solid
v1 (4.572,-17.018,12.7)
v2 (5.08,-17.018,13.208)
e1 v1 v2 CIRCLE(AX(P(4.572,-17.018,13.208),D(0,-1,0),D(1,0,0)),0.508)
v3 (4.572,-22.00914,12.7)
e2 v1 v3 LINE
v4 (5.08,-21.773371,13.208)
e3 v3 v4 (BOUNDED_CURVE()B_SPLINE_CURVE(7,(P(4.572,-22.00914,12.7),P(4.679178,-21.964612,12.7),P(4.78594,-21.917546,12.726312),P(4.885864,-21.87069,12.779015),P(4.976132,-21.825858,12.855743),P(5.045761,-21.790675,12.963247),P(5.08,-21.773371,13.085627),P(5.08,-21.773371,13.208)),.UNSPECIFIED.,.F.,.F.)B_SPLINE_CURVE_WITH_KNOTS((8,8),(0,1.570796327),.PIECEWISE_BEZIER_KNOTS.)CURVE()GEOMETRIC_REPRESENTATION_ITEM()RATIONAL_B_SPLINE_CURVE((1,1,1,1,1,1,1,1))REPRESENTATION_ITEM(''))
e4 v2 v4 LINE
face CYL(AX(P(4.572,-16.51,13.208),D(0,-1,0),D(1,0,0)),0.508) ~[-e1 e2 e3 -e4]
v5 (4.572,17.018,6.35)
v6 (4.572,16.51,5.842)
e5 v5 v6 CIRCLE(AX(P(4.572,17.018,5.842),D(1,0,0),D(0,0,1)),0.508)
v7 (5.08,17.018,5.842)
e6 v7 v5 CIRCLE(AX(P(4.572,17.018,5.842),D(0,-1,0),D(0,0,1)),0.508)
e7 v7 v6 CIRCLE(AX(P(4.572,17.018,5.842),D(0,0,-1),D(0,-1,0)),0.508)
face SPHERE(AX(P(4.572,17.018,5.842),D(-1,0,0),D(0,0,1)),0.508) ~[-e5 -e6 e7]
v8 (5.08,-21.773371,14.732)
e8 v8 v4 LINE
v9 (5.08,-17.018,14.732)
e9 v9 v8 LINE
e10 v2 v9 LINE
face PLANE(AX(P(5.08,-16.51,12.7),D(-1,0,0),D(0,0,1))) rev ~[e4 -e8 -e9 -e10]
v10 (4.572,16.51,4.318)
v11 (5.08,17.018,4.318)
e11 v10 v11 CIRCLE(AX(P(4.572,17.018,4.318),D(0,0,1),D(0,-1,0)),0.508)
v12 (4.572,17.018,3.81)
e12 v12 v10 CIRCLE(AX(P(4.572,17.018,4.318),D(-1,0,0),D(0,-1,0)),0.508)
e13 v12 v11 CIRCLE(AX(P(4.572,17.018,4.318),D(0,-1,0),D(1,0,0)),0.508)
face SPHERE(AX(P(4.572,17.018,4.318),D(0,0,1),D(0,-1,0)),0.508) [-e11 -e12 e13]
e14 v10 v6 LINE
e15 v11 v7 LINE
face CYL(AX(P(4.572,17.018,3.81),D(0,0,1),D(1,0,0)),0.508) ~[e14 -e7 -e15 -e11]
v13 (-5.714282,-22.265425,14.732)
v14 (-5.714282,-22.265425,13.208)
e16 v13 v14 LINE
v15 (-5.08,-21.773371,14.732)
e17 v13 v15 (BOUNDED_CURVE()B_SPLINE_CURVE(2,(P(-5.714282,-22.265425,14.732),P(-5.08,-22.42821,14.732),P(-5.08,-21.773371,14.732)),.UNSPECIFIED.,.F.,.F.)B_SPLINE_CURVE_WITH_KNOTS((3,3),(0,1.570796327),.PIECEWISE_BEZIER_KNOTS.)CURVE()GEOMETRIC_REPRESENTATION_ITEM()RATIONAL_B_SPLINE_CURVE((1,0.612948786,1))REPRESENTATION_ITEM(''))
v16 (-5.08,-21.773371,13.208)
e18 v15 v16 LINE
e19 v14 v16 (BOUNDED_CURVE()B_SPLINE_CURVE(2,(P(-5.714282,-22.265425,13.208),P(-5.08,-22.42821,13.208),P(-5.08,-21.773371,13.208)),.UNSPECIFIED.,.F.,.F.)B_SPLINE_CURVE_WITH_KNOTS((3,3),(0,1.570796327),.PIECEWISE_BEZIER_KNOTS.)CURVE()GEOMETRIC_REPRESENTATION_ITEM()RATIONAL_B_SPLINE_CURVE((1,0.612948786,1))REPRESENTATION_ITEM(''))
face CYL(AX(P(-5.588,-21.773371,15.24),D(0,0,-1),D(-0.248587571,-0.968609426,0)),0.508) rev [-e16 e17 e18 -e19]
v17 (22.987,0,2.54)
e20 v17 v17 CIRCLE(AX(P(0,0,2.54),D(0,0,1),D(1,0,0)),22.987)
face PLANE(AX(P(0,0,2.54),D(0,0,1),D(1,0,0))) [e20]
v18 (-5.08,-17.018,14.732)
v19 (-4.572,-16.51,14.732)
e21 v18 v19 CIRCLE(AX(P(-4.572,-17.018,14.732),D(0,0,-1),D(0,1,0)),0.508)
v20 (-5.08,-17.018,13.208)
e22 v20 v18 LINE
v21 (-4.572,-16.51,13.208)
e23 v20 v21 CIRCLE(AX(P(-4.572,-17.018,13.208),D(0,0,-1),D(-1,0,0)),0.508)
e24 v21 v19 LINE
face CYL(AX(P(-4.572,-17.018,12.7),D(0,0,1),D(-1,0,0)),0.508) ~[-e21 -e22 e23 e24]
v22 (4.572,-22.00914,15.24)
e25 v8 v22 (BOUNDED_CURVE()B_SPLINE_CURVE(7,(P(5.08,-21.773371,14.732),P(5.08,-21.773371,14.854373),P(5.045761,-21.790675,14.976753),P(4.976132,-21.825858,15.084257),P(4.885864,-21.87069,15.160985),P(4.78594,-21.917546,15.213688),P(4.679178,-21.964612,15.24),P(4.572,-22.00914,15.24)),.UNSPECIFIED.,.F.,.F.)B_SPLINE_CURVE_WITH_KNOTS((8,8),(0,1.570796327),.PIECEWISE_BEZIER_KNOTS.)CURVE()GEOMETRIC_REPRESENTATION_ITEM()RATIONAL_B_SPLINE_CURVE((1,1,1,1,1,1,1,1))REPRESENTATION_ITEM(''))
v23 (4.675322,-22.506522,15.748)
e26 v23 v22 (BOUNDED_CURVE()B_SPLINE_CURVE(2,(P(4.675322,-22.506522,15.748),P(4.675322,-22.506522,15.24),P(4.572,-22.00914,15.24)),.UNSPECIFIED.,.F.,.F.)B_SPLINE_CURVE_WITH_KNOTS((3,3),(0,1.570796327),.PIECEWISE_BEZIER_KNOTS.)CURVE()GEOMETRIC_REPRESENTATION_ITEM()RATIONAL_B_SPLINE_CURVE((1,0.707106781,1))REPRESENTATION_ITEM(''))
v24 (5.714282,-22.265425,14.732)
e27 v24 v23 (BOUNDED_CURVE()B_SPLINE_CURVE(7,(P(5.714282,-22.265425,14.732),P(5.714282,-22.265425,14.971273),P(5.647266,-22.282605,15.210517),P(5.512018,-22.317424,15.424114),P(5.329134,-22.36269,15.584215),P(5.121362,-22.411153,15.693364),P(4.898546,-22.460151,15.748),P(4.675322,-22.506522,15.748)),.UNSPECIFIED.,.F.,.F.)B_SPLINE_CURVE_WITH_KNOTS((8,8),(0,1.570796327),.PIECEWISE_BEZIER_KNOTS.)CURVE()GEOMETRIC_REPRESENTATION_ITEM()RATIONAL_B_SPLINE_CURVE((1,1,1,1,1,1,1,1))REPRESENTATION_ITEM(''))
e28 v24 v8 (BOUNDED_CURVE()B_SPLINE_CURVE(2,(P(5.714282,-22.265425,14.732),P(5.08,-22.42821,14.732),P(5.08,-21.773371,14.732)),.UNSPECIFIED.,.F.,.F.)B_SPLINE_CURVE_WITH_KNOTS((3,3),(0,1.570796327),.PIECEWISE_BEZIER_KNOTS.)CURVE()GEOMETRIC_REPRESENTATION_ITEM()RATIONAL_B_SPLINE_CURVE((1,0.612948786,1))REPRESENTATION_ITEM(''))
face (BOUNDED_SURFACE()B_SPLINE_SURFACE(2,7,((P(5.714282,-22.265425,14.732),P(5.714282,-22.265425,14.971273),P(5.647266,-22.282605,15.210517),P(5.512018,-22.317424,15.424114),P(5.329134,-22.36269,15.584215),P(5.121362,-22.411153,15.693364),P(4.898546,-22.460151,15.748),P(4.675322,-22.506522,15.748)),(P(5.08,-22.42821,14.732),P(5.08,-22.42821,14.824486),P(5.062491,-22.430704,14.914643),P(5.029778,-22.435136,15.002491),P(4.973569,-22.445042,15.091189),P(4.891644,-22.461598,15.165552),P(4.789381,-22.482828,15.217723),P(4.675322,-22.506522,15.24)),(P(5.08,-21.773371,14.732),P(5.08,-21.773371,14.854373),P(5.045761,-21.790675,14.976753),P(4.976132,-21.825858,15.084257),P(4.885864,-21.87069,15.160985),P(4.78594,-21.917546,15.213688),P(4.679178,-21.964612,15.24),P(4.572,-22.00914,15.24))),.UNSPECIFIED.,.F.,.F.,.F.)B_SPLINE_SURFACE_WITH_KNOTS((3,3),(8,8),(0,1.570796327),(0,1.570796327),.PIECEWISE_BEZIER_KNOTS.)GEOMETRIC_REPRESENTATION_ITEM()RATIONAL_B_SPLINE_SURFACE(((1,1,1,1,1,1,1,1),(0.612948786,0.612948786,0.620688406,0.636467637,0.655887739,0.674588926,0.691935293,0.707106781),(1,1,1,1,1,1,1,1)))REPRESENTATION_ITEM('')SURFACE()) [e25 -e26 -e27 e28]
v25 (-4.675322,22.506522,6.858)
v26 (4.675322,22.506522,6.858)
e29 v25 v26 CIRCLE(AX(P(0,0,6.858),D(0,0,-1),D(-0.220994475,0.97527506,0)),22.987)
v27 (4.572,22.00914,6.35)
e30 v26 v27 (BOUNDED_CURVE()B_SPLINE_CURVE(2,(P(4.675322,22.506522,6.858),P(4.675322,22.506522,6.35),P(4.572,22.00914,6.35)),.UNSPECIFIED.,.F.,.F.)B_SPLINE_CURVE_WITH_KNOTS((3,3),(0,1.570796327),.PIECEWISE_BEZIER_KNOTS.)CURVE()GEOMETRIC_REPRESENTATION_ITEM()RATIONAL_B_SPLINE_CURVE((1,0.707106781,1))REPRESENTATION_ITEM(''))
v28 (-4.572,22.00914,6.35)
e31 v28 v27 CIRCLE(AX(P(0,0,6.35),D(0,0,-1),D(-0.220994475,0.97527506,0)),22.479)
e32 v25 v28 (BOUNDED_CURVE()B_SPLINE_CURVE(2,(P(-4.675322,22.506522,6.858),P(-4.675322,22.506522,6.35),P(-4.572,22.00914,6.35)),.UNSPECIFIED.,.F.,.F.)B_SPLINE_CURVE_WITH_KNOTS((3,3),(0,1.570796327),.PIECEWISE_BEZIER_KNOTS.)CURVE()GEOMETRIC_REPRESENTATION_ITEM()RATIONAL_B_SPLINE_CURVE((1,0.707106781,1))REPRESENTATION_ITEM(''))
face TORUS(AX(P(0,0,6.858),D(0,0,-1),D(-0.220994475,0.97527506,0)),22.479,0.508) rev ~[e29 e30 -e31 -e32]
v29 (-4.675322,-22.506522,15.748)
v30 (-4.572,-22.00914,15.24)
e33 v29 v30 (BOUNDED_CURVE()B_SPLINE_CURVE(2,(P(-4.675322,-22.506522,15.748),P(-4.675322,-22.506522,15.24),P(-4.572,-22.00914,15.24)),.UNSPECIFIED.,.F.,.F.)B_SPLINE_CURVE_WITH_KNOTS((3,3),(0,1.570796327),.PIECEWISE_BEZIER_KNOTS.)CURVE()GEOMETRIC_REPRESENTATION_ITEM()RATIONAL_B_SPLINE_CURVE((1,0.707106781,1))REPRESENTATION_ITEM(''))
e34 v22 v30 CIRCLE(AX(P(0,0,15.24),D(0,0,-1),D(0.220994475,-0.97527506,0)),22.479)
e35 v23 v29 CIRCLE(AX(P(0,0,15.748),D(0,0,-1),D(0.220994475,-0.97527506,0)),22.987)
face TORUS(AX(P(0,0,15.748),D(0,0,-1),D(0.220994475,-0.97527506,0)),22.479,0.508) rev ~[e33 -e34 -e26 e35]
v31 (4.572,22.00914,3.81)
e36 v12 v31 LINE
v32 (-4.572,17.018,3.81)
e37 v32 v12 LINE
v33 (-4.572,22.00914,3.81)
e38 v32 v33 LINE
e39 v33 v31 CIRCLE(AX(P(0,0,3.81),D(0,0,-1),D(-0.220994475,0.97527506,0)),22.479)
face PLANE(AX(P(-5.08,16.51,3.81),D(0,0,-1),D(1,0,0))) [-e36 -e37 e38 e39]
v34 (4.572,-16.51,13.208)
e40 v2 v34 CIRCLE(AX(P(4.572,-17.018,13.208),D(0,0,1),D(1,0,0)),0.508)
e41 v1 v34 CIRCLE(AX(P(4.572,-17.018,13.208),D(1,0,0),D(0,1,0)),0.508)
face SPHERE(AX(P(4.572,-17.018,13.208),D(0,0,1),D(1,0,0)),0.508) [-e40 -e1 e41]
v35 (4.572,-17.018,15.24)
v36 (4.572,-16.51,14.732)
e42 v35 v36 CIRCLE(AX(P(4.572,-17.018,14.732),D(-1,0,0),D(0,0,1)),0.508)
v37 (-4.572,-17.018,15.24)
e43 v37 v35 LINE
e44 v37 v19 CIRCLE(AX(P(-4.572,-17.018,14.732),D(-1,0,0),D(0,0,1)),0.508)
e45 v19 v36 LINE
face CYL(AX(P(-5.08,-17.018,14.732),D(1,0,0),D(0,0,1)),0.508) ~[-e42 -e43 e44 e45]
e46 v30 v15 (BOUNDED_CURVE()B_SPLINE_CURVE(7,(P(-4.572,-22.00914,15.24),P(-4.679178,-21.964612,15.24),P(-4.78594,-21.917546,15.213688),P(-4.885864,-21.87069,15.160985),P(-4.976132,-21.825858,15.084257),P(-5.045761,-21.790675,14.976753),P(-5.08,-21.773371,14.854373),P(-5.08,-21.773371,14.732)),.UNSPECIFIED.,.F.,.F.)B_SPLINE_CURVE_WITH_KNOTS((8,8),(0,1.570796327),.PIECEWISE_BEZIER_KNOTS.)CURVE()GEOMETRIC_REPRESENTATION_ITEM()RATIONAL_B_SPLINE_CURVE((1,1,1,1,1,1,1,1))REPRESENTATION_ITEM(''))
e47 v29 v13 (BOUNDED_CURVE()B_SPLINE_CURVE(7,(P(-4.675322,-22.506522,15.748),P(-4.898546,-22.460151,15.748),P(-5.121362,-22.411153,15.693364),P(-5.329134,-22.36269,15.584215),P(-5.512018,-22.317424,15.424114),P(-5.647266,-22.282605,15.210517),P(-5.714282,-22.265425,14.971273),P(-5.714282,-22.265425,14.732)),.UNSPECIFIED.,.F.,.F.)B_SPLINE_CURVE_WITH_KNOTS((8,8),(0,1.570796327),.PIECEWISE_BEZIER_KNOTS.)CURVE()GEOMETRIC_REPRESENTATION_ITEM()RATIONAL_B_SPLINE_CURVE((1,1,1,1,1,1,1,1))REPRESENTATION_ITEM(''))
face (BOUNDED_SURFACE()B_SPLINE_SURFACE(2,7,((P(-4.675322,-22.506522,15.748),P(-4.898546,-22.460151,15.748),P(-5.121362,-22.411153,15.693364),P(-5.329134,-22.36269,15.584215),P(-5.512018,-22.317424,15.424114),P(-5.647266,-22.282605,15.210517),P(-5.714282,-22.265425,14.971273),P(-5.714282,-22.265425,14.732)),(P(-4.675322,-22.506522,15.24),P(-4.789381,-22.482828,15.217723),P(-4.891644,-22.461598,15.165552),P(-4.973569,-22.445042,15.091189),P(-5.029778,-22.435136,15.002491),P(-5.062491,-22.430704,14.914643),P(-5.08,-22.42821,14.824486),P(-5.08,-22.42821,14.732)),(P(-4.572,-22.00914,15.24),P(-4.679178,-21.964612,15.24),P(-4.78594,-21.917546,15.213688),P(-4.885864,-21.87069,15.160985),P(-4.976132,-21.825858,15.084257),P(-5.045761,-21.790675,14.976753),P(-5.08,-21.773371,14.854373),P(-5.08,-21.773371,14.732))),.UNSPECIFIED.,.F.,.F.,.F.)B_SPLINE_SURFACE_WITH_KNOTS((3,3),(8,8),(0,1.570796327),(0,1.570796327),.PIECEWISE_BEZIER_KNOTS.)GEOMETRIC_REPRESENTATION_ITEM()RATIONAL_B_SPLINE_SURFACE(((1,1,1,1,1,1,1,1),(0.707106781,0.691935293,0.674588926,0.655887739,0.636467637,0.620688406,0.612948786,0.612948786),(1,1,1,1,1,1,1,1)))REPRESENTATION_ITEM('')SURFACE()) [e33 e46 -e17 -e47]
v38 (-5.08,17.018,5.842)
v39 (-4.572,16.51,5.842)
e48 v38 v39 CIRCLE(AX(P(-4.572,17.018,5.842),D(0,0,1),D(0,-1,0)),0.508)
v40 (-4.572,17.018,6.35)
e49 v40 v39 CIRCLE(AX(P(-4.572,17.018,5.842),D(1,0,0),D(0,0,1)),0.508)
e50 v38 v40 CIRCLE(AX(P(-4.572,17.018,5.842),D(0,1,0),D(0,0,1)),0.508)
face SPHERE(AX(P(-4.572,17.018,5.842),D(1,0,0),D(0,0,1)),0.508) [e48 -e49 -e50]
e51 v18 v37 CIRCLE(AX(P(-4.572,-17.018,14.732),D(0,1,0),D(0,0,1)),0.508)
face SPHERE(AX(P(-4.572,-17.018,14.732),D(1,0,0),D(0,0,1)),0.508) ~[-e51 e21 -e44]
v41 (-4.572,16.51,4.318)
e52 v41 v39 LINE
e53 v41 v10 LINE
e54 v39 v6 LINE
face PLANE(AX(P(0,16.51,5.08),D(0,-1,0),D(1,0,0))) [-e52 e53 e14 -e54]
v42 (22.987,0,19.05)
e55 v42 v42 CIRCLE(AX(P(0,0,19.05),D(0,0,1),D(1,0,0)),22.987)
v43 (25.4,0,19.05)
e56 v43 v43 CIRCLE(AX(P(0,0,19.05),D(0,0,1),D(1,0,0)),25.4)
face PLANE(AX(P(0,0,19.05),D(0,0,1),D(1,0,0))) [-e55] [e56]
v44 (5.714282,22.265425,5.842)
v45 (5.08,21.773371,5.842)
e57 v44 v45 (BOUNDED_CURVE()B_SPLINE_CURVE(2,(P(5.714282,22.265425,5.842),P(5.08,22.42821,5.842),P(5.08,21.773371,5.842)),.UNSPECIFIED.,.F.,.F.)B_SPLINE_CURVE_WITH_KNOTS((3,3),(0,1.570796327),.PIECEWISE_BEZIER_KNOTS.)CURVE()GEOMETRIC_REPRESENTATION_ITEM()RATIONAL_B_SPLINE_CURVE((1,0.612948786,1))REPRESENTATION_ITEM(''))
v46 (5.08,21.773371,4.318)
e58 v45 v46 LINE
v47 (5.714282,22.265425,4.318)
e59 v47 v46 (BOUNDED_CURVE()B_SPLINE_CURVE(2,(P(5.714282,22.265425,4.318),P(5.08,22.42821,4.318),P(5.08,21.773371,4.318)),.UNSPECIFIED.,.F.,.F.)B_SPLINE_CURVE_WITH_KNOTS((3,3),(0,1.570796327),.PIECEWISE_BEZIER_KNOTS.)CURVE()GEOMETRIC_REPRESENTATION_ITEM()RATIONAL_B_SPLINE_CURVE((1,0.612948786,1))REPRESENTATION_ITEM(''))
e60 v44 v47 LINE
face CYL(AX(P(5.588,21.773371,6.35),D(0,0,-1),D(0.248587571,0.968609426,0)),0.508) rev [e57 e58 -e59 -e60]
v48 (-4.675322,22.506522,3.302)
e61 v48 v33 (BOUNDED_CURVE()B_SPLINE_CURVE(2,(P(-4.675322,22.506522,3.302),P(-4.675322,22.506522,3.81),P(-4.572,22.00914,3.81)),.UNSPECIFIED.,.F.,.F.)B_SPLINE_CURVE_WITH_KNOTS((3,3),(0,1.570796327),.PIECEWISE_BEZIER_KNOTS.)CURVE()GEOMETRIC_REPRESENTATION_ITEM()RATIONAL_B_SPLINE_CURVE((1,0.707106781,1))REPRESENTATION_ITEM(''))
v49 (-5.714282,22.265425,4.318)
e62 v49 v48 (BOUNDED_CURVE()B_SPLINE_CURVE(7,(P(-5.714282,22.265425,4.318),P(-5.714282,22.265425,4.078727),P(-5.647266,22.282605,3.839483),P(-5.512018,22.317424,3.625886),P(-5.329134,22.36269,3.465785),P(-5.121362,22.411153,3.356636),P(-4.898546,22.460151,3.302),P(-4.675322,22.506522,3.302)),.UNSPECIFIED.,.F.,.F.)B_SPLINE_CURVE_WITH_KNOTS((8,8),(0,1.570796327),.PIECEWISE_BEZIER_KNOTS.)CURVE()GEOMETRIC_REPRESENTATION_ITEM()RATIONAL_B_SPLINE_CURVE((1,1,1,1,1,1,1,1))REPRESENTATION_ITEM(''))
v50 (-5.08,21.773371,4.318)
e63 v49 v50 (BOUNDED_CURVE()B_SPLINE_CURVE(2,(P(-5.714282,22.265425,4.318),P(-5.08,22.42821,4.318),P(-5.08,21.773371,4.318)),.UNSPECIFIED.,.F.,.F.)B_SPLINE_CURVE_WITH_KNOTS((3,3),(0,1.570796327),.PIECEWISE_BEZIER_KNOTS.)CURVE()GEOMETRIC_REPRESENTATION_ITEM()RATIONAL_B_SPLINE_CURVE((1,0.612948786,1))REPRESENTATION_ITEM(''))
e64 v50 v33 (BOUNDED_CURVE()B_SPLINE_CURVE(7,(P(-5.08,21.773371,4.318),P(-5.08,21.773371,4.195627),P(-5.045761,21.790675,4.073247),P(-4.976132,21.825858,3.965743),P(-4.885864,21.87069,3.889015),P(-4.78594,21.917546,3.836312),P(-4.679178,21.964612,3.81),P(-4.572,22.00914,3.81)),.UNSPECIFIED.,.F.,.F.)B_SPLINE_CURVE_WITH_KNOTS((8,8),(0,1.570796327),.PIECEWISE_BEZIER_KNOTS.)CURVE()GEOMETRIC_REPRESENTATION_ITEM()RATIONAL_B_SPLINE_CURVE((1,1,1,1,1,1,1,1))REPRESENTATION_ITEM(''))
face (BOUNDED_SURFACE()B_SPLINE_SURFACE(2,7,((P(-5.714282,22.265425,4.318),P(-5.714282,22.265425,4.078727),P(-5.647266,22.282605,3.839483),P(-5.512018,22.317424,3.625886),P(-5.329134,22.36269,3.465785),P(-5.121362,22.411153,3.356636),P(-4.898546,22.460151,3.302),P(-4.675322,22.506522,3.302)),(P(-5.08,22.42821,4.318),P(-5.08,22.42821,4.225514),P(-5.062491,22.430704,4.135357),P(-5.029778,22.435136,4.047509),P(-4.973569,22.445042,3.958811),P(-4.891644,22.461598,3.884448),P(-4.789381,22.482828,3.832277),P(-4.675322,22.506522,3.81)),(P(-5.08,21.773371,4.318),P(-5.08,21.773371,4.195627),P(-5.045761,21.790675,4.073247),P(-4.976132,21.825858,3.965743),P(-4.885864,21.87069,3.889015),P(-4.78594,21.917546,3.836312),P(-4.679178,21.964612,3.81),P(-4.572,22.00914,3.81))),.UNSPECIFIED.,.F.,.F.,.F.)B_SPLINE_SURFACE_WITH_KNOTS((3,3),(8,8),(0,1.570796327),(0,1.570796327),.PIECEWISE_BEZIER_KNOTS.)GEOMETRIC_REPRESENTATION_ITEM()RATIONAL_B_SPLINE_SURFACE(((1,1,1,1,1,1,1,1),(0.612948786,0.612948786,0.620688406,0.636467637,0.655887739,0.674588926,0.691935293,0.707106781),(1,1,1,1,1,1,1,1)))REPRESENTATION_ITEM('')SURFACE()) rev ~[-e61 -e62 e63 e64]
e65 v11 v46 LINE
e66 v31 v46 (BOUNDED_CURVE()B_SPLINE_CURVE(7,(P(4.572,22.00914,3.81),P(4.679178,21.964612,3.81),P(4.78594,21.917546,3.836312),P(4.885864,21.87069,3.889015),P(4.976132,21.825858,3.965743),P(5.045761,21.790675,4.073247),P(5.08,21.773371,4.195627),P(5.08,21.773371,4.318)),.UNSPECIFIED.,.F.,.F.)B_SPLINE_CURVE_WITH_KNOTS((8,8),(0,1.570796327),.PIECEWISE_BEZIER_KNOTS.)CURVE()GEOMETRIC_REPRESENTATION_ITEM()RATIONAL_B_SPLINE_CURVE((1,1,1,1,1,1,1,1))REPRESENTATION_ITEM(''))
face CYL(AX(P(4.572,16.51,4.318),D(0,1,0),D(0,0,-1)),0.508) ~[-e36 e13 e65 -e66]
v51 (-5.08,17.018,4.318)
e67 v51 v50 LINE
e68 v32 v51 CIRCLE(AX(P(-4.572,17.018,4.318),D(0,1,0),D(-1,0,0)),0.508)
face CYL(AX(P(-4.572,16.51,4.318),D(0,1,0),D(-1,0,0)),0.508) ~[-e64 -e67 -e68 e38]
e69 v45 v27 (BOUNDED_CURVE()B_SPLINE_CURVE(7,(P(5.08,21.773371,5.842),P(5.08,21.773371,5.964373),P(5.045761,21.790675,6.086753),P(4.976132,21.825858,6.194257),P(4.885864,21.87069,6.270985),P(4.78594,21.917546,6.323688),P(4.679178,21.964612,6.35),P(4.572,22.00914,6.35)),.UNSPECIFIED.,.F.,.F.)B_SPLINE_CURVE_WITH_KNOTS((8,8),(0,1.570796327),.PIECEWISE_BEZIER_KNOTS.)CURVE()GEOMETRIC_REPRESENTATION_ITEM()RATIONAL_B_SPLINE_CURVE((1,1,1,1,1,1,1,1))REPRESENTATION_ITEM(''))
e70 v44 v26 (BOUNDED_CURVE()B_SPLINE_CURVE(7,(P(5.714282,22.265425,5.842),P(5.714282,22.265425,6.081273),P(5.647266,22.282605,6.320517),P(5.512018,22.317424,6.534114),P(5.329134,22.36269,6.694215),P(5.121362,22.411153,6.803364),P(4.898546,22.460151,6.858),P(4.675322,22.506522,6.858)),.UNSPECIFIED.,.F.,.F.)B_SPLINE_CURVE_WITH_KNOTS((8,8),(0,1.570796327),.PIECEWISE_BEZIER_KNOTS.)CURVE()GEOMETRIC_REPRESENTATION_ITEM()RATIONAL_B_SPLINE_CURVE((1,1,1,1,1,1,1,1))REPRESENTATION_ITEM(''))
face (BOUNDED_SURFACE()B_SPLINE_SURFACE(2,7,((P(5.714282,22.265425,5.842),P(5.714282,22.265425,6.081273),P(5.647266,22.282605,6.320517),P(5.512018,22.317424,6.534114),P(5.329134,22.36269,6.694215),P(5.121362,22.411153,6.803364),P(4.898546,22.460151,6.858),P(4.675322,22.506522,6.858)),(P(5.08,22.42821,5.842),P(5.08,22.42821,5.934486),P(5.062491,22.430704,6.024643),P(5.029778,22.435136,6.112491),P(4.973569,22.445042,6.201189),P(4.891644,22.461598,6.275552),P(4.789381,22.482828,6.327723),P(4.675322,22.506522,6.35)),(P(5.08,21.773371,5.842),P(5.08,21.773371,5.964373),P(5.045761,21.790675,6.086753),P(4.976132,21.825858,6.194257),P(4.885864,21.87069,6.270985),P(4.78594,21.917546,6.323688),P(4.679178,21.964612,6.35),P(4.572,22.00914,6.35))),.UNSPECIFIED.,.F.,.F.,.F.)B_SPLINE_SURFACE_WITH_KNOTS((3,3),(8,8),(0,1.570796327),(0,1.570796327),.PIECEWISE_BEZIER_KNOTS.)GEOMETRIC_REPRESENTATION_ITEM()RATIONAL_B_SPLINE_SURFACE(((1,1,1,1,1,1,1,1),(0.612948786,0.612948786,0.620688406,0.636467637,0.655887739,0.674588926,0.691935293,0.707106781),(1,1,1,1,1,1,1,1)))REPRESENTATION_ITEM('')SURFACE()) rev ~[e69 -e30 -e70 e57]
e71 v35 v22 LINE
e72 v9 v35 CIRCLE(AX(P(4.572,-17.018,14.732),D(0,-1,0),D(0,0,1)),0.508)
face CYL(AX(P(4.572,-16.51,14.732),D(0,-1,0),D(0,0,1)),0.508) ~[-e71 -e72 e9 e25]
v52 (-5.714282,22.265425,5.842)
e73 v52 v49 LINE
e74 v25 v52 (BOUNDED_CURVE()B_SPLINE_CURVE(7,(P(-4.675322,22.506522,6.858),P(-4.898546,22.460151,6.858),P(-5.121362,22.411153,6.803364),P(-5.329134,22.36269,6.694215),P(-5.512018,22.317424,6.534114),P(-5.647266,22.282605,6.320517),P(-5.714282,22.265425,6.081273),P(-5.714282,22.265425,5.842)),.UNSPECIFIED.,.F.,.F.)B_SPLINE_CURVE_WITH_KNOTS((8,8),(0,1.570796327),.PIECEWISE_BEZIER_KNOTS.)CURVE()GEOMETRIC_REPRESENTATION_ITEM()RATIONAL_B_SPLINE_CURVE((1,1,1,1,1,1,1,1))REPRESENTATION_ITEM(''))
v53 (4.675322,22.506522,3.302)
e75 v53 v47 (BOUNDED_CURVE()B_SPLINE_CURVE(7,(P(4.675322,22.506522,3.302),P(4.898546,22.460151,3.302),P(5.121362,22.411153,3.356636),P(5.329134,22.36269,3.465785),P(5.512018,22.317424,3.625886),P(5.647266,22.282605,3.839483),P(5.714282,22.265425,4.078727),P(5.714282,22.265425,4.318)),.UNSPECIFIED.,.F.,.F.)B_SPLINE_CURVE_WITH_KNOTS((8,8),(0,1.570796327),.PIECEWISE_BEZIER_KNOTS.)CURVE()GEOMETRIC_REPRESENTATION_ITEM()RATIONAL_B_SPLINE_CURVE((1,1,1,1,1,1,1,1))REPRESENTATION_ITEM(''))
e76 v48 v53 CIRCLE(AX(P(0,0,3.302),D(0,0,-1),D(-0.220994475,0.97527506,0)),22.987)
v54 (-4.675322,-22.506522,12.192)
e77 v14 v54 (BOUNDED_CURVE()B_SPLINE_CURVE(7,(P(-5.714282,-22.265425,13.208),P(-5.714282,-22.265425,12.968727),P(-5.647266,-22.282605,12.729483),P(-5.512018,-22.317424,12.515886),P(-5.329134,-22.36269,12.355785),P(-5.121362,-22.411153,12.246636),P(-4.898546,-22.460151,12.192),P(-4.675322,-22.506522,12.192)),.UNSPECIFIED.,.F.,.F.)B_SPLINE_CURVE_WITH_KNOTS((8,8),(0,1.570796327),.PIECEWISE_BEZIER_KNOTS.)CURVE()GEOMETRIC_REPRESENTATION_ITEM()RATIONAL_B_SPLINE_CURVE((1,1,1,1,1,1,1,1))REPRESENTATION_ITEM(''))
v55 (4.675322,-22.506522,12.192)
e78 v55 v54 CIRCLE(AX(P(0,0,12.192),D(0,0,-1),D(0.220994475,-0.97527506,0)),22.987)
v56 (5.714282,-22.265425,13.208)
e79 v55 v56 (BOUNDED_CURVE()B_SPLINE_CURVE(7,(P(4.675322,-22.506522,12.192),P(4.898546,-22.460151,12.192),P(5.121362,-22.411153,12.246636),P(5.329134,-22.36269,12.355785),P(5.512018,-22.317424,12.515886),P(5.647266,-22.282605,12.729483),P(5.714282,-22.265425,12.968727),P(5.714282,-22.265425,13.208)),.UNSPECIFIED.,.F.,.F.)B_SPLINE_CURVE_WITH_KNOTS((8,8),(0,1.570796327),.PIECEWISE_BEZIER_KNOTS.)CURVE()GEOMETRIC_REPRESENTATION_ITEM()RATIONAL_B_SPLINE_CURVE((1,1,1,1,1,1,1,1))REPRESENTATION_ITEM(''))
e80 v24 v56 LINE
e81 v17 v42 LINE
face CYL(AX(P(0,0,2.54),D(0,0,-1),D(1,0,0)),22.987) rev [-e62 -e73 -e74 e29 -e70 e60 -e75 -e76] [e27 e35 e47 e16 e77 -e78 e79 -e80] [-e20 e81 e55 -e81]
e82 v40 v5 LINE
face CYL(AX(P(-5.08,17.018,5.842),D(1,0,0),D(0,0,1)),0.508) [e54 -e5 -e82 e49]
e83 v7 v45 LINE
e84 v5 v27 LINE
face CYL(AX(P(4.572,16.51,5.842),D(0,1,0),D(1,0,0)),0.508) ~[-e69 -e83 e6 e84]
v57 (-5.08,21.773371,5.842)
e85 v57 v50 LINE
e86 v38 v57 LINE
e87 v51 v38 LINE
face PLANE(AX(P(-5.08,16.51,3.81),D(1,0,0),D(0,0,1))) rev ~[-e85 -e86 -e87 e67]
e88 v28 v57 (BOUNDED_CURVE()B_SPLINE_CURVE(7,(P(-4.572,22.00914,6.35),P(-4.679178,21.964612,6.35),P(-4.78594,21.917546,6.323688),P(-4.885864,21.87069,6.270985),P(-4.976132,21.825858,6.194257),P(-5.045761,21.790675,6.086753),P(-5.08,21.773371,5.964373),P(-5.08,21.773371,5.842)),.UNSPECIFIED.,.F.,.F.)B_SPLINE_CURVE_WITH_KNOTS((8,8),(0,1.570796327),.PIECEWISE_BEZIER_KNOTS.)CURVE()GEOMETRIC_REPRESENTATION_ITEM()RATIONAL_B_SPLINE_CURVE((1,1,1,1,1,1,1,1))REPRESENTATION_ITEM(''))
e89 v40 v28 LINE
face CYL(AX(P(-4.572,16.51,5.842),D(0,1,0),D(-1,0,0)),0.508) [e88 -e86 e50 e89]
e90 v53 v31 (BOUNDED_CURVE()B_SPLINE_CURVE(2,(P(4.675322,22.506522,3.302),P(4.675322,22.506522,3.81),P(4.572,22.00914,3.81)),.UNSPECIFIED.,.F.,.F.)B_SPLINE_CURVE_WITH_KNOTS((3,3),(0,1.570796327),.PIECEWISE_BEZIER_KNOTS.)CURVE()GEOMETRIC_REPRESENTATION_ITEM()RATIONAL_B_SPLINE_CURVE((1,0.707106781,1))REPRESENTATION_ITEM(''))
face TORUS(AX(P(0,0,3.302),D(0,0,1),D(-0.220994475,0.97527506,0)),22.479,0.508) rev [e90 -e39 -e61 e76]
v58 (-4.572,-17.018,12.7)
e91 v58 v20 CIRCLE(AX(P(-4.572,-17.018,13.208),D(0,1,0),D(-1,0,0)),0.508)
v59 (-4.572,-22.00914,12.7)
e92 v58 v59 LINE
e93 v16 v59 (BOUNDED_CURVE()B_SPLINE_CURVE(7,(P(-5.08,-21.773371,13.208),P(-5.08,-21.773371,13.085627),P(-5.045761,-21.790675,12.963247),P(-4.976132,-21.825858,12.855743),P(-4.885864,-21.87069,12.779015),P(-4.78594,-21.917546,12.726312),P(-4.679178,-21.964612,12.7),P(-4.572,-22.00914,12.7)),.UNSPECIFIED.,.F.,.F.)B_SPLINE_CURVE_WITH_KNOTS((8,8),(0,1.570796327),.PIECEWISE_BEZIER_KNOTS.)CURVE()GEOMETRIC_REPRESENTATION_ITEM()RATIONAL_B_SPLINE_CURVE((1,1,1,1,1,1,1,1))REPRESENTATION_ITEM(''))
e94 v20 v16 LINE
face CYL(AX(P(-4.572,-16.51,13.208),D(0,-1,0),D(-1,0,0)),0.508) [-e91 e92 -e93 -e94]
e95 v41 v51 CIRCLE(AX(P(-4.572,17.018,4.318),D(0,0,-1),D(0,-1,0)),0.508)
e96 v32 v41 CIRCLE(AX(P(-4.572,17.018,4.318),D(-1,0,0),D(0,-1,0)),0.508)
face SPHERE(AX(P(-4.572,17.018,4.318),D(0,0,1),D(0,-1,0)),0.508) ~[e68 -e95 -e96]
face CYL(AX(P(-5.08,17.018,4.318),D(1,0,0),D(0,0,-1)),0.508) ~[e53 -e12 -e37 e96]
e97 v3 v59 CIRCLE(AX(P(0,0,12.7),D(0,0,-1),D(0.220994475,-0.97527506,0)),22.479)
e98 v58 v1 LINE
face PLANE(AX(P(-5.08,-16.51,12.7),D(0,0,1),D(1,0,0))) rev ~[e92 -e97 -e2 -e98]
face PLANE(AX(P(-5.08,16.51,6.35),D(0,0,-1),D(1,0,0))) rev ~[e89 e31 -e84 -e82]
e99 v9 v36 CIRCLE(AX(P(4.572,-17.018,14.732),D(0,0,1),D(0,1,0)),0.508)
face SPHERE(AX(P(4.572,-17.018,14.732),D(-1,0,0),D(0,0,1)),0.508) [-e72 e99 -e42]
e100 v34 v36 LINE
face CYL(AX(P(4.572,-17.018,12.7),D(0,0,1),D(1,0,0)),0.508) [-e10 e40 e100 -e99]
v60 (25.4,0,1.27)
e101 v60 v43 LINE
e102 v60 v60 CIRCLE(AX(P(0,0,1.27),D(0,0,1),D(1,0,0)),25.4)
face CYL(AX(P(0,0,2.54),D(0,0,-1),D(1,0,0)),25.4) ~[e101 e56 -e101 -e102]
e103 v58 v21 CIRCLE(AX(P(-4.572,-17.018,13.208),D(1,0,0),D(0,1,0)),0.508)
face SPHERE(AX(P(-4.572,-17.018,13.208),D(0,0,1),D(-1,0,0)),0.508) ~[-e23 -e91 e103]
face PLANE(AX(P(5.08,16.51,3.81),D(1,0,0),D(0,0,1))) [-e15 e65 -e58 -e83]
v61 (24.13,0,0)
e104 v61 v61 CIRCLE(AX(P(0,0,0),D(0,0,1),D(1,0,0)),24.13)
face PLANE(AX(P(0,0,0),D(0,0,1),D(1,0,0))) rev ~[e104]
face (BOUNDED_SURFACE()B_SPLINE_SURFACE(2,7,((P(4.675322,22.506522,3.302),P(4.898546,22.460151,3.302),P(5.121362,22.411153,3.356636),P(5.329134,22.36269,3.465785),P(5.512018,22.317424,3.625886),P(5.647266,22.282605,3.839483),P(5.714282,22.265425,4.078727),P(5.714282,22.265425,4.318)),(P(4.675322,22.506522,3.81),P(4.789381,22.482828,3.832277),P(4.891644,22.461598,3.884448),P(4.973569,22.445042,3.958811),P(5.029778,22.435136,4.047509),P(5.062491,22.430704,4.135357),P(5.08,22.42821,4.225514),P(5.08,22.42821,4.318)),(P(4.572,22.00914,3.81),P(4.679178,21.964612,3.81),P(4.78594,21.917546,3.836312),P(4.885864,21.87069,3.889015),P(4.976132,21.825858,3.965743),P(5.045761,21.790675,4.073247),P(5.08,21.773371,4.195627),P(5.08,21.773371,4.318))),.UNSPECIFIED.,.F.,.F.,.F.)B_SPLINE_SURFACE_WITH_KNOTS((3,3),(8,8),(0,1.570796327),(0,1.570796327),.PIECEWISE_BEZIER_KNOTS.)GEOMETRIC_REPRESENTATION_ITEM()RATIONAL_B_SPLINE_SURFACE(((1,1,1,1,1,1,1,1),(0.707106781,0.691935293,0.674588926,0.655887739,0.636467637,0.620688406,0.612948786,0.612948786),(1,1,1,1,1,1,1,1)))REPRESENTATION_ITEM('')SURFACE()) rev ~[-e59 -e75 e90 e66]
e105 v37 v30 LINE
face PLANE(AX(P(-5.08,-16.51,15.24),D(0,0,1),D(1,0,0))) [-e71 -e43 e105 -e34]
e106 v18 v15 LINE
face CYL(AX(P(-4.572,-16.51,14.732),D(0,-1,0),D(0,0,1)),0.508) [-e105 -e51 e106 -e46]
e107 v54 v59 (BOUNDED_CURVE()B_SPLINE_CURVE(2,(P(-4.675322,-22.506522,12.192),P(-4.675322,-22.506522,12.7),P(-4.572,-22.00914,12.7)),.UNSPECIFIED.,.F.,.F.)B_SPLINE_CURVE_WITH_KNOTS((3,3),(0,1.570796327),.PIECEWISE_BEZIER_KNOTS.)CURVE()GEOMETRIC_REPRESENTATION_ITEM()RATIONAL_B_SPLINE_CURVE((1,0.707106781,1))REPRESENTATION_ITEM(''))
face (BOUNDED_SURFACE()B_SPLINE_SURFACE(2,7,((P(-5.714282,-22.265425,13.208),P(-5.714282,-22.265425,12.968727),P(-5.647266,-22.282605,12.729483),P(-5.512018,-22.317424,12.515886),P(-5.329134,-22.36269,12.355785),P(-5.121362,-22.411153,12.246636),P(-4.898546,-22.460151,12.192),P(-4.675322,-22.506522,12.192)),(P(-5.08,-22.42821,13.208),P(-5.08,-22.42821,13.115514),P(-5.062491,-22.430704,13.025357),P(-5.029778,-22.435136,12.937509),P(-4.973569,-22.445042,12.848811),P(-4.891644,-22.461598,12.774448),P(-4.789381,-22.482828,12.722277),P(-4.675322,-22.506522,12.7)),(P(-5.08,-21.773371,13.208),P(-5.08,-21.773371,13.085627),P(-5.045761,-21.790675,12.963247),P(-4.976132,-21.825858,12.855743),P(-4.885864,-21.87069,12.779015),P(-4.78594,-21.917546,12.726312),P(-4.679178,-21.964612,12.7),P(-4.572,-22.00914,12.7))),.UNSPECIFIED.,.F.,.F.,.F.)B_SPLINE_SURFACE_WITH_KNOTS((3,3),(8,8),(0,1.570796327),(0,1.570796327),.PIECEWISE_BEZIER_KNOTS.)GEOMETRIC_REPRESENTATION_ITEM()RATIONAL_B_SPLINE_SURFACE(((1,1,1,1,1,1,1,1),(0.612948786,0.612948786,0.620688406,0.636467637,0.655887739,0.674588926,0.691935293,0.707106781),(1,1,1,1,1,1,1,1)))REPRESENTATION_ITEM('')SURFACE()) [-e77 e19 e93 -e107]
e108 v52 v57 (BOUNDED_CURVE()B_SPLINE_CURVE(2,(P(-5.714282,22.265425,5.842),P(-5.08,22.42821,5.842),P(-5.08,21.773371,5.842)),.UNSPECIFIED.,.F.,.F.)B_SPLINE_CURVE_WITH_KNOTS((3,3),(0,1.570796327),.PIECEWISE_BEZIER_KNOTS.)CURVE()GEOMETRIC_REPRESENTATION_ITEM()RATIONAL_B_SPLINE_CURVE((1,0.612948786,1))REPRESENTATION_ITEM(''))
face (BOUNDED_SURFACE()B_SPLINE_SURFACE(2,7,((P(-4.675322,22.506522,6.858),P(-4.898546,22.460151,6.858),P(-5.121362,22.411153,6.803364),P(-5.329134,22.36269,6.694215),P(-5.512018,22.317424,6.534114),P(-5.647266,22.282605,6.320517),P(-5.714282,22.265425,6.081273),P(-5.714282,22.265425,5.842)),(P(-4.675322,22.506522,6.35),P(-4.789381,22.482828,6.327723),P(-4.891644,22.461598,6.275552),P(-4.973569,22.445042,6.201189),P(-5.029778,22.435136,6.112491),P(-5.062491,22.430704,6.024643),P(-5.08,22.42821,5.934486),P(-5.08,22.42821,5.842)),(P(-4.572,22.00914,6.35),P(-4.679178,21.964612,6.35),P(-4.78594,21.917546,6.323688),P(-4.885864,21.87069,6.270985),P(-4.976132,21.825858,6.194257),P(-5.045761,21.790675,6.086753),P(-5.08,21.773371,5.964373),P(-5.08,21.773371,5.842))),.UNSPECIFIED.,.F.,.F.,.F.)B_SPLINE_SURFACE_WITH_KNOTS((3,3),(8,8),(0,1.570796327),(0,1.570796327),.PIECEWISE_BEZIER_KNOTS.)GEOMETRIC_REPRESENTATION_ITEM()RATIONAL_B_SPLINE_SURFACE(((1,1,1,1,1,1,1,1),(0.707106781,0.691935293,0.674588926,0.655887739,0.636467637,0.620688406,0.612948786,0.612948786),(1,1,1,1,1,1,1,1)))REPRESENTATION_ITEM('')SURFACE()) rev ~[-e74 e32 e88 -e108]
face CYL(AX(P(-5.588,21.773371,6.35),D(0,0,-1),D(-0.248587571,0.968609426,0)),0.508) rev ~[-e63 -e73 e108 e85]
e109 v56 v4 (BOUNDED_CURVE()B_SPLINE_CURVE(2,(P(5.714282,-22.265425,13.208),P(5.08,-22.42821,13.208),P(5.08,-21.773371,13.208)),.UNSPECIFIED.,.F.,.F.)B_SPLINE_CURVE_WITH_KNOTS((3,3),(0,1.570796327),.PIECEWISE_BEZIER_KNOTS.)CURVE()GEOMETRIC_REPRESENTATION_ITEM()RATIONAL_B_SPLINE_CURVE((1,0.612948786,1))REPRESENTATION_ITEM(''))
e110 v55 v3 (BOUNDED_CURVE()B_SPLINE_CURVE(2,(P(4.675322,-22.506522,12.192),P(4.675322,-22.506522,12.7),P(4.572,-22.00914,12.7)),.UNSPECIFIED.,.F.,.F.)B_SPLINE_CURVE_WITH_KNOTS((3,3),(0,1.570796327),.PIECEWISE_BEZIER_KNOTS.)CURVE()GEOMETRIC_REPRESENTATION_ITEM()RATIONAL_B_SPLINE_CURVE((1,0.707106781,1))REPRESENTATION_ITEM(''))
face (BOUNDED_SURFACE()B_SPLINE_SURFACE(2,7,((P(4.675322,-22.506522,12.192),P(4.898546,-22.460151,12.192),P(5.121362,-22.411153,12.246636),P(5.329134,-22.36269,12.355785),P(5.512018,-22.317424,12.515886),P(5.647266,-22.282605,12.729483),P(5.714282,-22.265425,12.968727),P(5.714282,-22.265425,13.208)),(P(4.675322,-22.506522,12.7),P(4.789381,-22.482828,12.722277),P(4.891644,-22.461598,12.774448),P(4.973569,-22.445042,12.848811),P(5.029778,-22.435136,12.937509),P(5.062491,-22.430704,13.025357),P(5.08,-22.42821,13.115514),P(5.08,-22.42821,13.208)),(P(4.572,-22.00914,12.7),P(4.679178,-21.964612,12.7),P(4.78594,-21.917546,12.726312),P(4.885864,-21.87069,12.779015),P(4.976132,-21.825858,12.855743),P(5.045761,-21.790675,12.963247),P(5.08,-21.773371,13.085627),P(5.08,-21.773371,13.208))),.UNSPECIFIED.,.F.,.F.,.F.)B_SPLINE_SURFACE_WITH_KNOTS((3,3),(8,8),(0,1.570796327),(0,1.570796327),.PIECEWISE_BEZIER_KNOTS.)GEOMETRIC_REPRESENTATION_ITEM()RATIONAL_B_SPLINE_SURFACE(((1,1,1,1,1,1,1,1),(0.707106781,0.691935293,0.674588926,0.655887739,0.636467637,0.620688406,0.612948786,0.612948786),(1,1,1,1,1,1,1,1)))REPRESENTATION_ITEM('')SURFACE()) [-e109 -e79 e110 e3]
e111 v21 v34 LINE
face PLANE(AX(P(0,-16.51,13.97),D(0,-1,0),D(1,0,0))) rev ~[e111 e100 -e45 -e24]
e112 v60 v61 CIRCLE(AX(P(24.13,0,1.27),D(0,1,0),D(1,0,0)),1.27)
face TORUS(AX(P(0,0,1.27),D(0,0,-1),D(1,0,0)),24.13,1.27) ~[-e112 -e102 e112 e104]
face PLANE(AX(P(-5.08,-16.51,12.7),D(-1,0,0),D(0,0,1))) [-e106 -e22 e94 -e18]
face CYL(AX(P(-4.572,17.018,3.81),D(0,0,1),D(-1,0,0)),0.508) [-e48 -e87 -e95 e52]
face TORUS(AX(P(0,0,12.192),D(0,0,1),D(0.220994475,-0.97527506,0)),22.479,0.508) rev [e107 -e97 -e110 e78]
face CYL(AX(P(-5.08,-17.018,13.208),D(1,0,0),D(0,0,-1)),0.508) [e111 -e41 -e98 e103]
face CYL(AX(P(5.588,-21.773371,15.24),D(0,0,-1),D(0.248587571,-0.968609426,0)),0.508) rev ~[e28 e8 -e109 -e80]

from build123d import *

# Parameters (mm, degrees)
F0_R     = 25.4
F1_DEPTH = 2.54
F2_R     = 25.4
F2_R_2   = 22.987
F3_DEPTH = 16.51
F6_W     = 10.16
F6_H     = 2.54
F8_W     = 10.16
F8_H     = 2.54
F10_R    = 1.27
F11_R    = 0.508


with BuildPart() as f1:
    # F0 (on Top) → F1 (new body)
    with BuildSketch(Plane.XY):
        Circle(F0_R)
    extrude(amount=F1_DEPTH)

    # F2 (on face) → F3 (join)
    with BuildSketch(Plane.XY.offset(2.54)):
        Circle(F2_R)
        Circle(F2_R_2, mode=Mode.SUBTRACT)
    extrude(amount=F3_DEPTH)

    # F6 (on offset) → F7 (join, up to the next surface of F1)
    with BuildSketch(Plane.XZ.offset(16.51)):
        with Locations((0, 13.97)):
            Rectangle(F6_W, F6_H)
    extrude(until=Until.NEXT)

    # F8 (on offset) → F9 (join, up to the next surface of F1)
    with BuildSketch(Plane.XZ.offset(-16.51)):
        with Locations((0, 5.08)):
            Rectangle(F8_W, F8_H)
    extrude(until=Until.NEXT, dir=(0, 1, 0))

    # F10
    f10_edges = [f1.edges().sort_by_distance(p)[0] for p in [
        (-25.4, 0, 0),
    ]]
    fillet(f10_edges, radius=F10_R)

    # F11
    f11_edges = [f1.edges().sort_by_distance(p)[0] for p in [
        (0, -16.51, 15.24),
        (-5.08, -19.464324, 15.24),
        (0, -22.987, 15.24),
        (5.08, -19.464324, 15.24),
        (-5.08, -16.51, 13.97),
        (-5.08, -19.464324, 12.7),
        (-5.08, -22.418648, 13.97),
        (5.08, -16.51, 13.97),
        (5.08, -22.418648, 13.97),
        (5.08, -19.464324, 12.7),
        (0, -16.51, 12.7),
        (25.028026, 0, 0.371974),
        (-25.4, 0, 1.27),
        (-24.13, 0, 0),
        (0, 16.51, 6.35),
        (-5.08, 19.464324, 6.35),
        (0, 22.987, 6.35),
        (5.08, 19.464324, 6.35),
        (5.08, 16.51, 5.08),
        (-5.08, 16.51, 5.08),
        (0, 16.51, 3.81),
        (5.08, 22.418648, 5.08),
        (5.08, 19.464324, 3.81),
        (-5.08, 19.464324, 3.81),
        (-5.08, 22.418648, 5.08),
        (0, -22.987, 12.7),
        (0, 22.987, 3.81),
    ]]
    fillet(f11_edges, radius=F11_R)


solid = f1.part
